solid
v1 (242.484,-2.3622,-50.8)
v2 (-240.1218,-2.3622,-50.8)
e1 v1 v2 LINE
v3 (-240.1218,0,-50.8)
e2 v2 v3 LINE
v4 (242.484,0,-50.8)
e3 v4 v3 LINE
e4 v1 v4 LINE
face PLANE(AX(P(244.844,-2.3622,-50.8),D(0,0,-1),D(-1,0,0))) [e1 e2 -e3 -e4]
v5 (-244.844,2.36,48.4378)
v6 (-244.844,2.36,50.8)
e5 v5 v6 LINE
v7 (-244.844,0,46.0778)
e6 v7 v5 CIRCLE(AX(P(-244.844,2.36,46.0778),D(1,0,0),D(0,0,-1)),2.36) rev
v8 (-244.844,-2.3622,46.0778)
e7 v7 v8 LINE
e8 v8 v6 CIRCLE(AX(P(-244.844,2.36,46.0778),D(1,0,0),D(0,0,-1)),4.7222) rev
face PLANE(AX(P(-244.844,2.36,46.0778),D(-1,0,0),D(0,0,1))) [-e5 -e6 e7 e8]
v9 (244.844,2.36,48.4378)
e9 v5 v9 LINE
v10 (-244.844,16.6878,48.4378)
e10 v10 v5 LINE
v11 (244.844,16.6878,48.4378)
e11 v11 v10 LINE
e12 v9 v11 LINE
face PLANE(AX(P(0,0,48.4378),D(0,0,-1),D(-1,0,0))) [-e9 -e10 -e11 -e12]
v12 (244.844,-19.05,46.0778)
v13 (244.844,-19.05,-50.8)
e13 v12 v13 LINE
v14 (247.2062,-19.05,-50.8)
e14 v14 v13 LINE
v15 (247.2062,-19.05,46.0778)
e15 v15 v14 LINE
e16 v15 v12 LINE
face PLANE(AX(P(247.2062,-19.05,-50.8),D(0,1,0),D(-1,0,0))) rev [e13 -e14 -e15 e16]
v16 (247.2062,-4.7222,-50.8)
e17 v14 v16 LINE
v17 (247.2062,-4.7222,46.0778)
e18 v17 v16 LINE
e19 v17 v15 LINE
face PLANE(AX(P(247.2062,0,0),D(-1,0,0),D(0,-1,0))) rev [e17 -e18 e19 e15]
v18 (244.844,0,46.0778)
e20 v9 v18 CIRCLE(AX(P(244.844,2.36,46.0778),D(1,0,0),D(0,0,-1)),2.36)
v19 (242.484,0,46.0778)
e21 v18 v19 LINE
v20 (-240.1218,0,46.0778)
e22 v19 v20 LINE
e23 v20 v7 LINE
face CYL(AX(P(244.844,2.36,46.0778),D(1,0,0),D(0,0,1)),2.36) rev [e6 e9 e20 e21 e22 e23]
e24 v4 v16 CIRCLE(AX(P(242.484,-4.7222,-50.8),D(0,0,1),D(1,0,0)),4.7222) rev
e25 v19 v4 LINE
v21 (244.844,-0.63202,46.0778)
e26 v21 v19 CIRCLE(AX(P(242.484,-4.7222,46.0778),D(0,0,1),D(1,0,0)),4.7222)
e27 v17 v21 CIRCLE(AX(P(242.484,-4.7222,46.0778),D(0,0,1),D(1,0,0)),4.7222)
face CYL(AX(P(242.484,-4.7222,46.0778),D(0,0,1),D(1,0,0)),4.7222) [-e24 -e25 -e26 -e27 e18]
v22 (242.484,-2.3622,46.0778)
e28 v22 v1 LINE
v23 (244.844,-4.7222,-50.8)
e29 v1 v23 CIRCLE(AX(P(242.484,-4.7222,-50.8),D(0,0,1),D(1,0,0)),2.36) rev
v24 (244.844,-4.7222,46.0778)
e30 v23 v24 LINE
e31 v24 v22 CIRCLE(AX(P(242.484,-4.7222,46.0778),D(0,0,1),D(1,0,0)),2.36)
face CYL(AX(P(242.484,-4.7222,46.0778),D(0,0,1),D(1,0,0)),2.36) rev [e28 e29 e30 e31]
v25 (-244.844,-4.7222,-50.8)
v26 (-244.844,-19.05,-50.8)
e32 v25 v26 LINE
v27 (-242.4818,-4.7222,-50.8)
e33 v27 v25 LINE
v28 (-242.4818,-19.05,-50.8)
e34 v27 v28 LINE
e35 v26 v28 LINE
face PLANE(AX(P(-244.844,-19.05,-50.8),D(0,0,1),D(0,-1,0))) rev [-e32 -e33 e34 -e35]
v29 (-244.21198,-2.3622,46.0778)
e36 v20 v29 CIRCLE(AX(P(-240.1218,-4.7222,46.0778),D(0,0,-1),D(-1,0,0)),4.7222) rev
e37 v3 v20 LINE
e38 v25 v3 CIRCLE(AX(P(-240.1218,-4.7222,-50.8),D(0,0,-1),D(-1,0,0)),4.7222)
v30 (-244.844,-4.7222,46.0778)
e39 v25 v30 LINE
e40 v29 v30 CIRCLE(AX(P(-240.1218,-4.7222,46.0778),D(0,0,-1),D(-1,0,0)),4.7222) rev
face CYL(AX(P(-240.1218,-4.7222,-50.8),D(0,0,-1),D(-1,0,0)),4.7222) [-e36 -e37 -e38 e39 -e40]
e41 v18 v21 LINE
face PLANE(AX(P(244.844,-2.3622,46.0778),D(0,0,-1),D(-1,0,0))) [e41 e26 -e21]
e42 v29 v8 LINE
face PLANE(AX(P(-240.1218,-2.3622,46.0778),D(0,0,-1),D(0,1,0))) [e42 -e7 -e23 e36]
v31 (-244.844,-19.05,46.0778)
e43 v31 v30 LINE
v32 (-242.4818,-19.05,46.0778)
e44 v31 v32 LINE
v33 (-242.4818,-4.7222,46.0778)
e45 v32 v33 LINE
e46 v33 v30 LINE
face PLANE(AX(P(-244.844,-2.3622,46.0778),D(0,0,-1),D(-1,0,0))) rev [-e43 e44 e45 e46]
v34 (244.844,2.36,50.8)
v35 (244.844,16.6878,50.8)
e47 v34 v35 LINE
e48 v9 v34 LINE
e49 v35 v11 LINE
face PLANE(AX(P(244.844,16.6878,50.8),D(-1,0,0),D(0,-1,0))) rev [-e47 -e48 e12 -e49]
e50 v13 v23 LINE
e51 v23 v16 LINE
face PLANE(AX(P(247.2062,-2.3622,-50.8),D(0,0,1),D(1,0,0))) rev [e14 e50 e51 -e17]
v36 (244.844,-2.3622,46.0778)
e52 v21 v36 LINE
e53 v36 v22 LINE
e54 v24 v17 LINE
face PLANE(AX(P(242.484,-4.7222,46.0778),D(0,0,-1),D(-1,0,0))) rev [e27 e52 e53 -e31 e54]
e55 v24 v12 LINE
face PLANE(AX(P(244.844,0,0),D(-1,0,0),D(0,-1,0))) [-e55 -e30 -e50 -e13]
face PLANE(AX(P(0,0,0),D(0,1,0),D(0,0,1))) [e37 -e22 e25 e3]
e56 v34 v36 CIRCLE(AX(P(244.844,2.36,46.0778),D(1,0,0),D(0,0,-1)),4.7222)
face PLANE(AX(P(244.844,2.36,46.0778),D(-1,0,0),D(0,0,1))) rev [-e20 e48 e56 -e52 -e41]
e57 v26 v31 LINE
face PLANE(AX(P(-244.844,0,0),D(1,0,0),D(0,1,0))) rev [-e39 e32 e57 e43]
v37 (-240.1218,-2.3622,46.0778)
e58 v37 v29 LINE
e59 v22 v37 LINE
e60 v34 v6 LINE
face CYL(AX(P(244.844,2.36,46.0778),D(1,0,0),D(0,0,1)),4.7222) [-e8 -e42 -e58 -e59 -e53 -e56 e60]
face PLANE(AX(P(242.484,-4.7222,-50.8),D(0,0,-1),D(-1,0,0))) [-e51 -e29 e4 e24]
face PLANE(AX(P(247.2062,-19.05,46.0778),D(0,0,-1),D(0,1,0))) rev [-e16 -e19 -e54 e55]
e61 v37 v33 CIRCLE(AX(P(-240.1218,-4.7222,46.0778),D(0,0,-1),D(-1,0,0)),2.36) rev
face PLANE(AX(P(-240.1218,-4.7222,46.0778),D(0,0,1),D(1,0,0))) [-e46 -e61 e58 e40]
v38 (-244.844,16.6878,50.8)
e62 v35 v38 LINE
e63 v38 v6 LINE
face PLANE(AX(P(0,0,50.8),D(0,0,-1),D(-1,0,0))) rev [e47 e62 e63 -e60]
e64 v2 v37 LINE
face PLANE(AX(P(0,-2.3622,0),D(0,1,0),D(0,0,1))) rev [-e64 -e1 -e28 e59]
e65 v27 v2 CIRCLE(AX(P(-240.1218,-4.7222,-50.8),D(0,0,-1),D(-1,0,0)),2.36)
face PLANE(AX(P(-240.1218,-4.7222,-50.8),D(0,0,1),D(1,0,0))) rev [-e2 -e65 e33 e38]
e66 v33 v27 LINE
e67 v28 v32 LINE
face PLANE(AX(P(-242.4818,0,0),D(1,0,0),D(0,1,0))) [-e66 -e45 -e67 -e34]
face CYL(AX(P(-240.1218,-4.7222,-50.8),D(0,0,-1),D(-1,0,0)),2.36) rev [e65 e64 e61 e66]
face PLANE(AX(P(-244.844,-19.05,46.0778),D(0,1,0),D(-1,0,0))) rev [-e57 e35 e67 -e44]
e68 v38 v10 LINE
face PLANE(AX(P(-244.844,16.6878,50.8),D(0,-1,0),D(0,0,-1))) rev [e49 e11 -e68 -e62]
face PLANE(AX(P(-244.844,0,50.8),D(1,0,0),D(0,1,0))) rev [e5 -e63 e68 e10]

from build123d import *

# Parameters (mm, degrees)
SKETCH1_W                    = 489.688000048
SKETCH1_H                    = 101.6
BASE_FLANGE1_DEPTH           = 2.3622
EDGE_FLANGE1_STRIP_W         = 14.1688
EDGE_FLANGE1_STRIP_H         = 2.3622
EDGE_FLANGE1_STRIP_CUT_DEPTH = 489.688000048
EDGE_FLANGE1_DEPTH           = 489.688000048
EDGE_FLANGE2_STRIP_W         = 14.1688
EDGE_FLANGE2_STRIP_H         = 2.3622
EDGE_FLANGE2_STRIP_CUT_DEPTH = 96.8778
EDGE_FLANGE2_DEPTH           = 96.8778
EDGE_FLANGE3_STRIP_W         = 14.1688
EDGE_FLANGE3_STRIP_H         = 2.3622
EDGE_FLANGE3_STRIP_CUT_DEPTH = 96.8778
EDGE_FLANGE3_DEPTH           = 96.8778


# Sheet-metal steps are written as plain solids
with BuildPart() as part:
    # Sketch1 → Base-Flange1 (new body)
    with BuildSketch(Plane(origin=(0, 0, 0), x_dir=(1, 0, 0), z_dir=(0, 1, 0))):
        Rectangle(SKETCH1_W, SKETCH1_H)
    extrude(amount=-BASE_FLANGE1_DEPTH)

    # Edge-Flange1 strip (across the edge) → Edge-Flange1 strip cut (cut)
    with BuildSketch(Plane(origin=(-244.844000024, 0, 50.8), x_dir=(0, 0, -1), z_dir=(1, 0, 0))):
        with Locations((-2.3622, -1.1811)):
            Rectangle(EDGE_FLANGE1_STRIP_W, EDGE_FLANGE1_STRIP_H)
    extrude(amount=EDGE_FLANGE1_STRIP_CUT_DEPTH, mode=Mode.SUBTRACT)

    # Edge-Flange1 section (across the edge) → Edge-Flange1 (add)
    with BuildSketch(Plane(origin=(-244.844000024, 0, 50.8), x_dir=(0, 0, -1), z_dir=(1, 0, 0))):
        with BuildLine():
            Line((0, 2.36), (0, 16.6878))
            Line((0, 16.6878), (2.3622, 16.6878))
            Line((2.3622, 16.6878), (2.3622, 2.36))
            ThreePointArc((2.3622, 2.36), (3.053427996, 0.691227996), (4.7222, 0))
            Line((4.7222, 0), (4.7222, -2.3622))
            ThreePointArc((4.7222, -2.3622), (1.383100358, -0.979099642), (0, 2.36))
        make_face()
    extrude(amount=EDGE_FLANGE1_DEPTH)

    # Edge-Flange2 strip (across the edge) → Edge-Flange2 strip cut (cut)
    with BuildSketch(Plane(origin=(-244.844000024, -2.3622, 46.0778), x_dir=(1, 0, 0), z_dir=(0, 0, -1))):
        with Locations((-2.3622, -1.1811)):
            Rectangle(EDGE_FLANGE2_STRIP_W, EDGE_FLANGE2_STRIP_H)
    extrude(amount=EDGE_FLANGE2_STRIP_CUT_DEPTH, mode=Mode.SUBTRACT)

    # Edge-Flange2 section (across the edge) → Edge-Flange2 (add)
    with BuildSketch(Plane(origin=(-244.844000024, -2.3622, 46.0778), x_dir=(1, 0, 0), z_dir=(0, 0, -1))):
        with BuildLine():
            Line((0, 2.36), (0, 16.6878))
            Line((0, 16.6878), (2.3622, 16.6878))
            Line((2.3622, 16.6878), (2.3622, 2.36))
            ThreePointArc((2.3622, 2.36), (3.053427996, 0.691227996), (4.7222, 0))
            Line((4.7222, 0), (4.7222, -2.3622))
            ThreePointArc((4.7222, -2.3622), (1.383100358, -0.979099642), (0, 2.36))
        make_face()
    extrude(amount=EDGE_FLANGE2_DEPTH)

    # Edge-Flange3 strip (across the edge) → Edge-Flange3 strip cut (cut)
    with BuildSketch(Plane(origin=(244.844000024, -2.3622, -50.8), x_dir=(-1, 0, 0), z_dir=(0, 0, 1))):
        with Locations((-4.7244, -1.1811)):
            Rectangle(EDGE_FLANGE3_STRIP_W, EDGE_FLANGE3_STRIP_H)
    extrude(amount=EDGE_FLANGE3_STRIP_CUT_DEPTH, mode=Mode.SUBTRACT)

    # Edge-Flange3 section (across the edge) → Edge-Flange3 (add)
    with BuildSketch(Plane(origin=(244.844000024, -2.3622, -50.8), x_dir=(-1, 0, 0), z_dir=(0, 0, 1))):
        with BuildLine():
            Line((-2.3622, 2.36), (-2.3622, 16.6878))
            Line((-2.3622, 16.6878), (0, 16.6878))
            Line((0, 16.6878), (0, 2.36))
            ThreePointArc((0, 2.36), (0.691227996, 0.691227996), (2.36, 0))
            Line((2.36, 0), (2.36, -2.3622))
            ThreePointArc((2.36, -2.3622), (-0.979099642, -0.979099642), (-2.3622, 2.36))
        make_face()
    extrude(amount=EDGE_FLANGE3_DEPTH)


solid = part.part
